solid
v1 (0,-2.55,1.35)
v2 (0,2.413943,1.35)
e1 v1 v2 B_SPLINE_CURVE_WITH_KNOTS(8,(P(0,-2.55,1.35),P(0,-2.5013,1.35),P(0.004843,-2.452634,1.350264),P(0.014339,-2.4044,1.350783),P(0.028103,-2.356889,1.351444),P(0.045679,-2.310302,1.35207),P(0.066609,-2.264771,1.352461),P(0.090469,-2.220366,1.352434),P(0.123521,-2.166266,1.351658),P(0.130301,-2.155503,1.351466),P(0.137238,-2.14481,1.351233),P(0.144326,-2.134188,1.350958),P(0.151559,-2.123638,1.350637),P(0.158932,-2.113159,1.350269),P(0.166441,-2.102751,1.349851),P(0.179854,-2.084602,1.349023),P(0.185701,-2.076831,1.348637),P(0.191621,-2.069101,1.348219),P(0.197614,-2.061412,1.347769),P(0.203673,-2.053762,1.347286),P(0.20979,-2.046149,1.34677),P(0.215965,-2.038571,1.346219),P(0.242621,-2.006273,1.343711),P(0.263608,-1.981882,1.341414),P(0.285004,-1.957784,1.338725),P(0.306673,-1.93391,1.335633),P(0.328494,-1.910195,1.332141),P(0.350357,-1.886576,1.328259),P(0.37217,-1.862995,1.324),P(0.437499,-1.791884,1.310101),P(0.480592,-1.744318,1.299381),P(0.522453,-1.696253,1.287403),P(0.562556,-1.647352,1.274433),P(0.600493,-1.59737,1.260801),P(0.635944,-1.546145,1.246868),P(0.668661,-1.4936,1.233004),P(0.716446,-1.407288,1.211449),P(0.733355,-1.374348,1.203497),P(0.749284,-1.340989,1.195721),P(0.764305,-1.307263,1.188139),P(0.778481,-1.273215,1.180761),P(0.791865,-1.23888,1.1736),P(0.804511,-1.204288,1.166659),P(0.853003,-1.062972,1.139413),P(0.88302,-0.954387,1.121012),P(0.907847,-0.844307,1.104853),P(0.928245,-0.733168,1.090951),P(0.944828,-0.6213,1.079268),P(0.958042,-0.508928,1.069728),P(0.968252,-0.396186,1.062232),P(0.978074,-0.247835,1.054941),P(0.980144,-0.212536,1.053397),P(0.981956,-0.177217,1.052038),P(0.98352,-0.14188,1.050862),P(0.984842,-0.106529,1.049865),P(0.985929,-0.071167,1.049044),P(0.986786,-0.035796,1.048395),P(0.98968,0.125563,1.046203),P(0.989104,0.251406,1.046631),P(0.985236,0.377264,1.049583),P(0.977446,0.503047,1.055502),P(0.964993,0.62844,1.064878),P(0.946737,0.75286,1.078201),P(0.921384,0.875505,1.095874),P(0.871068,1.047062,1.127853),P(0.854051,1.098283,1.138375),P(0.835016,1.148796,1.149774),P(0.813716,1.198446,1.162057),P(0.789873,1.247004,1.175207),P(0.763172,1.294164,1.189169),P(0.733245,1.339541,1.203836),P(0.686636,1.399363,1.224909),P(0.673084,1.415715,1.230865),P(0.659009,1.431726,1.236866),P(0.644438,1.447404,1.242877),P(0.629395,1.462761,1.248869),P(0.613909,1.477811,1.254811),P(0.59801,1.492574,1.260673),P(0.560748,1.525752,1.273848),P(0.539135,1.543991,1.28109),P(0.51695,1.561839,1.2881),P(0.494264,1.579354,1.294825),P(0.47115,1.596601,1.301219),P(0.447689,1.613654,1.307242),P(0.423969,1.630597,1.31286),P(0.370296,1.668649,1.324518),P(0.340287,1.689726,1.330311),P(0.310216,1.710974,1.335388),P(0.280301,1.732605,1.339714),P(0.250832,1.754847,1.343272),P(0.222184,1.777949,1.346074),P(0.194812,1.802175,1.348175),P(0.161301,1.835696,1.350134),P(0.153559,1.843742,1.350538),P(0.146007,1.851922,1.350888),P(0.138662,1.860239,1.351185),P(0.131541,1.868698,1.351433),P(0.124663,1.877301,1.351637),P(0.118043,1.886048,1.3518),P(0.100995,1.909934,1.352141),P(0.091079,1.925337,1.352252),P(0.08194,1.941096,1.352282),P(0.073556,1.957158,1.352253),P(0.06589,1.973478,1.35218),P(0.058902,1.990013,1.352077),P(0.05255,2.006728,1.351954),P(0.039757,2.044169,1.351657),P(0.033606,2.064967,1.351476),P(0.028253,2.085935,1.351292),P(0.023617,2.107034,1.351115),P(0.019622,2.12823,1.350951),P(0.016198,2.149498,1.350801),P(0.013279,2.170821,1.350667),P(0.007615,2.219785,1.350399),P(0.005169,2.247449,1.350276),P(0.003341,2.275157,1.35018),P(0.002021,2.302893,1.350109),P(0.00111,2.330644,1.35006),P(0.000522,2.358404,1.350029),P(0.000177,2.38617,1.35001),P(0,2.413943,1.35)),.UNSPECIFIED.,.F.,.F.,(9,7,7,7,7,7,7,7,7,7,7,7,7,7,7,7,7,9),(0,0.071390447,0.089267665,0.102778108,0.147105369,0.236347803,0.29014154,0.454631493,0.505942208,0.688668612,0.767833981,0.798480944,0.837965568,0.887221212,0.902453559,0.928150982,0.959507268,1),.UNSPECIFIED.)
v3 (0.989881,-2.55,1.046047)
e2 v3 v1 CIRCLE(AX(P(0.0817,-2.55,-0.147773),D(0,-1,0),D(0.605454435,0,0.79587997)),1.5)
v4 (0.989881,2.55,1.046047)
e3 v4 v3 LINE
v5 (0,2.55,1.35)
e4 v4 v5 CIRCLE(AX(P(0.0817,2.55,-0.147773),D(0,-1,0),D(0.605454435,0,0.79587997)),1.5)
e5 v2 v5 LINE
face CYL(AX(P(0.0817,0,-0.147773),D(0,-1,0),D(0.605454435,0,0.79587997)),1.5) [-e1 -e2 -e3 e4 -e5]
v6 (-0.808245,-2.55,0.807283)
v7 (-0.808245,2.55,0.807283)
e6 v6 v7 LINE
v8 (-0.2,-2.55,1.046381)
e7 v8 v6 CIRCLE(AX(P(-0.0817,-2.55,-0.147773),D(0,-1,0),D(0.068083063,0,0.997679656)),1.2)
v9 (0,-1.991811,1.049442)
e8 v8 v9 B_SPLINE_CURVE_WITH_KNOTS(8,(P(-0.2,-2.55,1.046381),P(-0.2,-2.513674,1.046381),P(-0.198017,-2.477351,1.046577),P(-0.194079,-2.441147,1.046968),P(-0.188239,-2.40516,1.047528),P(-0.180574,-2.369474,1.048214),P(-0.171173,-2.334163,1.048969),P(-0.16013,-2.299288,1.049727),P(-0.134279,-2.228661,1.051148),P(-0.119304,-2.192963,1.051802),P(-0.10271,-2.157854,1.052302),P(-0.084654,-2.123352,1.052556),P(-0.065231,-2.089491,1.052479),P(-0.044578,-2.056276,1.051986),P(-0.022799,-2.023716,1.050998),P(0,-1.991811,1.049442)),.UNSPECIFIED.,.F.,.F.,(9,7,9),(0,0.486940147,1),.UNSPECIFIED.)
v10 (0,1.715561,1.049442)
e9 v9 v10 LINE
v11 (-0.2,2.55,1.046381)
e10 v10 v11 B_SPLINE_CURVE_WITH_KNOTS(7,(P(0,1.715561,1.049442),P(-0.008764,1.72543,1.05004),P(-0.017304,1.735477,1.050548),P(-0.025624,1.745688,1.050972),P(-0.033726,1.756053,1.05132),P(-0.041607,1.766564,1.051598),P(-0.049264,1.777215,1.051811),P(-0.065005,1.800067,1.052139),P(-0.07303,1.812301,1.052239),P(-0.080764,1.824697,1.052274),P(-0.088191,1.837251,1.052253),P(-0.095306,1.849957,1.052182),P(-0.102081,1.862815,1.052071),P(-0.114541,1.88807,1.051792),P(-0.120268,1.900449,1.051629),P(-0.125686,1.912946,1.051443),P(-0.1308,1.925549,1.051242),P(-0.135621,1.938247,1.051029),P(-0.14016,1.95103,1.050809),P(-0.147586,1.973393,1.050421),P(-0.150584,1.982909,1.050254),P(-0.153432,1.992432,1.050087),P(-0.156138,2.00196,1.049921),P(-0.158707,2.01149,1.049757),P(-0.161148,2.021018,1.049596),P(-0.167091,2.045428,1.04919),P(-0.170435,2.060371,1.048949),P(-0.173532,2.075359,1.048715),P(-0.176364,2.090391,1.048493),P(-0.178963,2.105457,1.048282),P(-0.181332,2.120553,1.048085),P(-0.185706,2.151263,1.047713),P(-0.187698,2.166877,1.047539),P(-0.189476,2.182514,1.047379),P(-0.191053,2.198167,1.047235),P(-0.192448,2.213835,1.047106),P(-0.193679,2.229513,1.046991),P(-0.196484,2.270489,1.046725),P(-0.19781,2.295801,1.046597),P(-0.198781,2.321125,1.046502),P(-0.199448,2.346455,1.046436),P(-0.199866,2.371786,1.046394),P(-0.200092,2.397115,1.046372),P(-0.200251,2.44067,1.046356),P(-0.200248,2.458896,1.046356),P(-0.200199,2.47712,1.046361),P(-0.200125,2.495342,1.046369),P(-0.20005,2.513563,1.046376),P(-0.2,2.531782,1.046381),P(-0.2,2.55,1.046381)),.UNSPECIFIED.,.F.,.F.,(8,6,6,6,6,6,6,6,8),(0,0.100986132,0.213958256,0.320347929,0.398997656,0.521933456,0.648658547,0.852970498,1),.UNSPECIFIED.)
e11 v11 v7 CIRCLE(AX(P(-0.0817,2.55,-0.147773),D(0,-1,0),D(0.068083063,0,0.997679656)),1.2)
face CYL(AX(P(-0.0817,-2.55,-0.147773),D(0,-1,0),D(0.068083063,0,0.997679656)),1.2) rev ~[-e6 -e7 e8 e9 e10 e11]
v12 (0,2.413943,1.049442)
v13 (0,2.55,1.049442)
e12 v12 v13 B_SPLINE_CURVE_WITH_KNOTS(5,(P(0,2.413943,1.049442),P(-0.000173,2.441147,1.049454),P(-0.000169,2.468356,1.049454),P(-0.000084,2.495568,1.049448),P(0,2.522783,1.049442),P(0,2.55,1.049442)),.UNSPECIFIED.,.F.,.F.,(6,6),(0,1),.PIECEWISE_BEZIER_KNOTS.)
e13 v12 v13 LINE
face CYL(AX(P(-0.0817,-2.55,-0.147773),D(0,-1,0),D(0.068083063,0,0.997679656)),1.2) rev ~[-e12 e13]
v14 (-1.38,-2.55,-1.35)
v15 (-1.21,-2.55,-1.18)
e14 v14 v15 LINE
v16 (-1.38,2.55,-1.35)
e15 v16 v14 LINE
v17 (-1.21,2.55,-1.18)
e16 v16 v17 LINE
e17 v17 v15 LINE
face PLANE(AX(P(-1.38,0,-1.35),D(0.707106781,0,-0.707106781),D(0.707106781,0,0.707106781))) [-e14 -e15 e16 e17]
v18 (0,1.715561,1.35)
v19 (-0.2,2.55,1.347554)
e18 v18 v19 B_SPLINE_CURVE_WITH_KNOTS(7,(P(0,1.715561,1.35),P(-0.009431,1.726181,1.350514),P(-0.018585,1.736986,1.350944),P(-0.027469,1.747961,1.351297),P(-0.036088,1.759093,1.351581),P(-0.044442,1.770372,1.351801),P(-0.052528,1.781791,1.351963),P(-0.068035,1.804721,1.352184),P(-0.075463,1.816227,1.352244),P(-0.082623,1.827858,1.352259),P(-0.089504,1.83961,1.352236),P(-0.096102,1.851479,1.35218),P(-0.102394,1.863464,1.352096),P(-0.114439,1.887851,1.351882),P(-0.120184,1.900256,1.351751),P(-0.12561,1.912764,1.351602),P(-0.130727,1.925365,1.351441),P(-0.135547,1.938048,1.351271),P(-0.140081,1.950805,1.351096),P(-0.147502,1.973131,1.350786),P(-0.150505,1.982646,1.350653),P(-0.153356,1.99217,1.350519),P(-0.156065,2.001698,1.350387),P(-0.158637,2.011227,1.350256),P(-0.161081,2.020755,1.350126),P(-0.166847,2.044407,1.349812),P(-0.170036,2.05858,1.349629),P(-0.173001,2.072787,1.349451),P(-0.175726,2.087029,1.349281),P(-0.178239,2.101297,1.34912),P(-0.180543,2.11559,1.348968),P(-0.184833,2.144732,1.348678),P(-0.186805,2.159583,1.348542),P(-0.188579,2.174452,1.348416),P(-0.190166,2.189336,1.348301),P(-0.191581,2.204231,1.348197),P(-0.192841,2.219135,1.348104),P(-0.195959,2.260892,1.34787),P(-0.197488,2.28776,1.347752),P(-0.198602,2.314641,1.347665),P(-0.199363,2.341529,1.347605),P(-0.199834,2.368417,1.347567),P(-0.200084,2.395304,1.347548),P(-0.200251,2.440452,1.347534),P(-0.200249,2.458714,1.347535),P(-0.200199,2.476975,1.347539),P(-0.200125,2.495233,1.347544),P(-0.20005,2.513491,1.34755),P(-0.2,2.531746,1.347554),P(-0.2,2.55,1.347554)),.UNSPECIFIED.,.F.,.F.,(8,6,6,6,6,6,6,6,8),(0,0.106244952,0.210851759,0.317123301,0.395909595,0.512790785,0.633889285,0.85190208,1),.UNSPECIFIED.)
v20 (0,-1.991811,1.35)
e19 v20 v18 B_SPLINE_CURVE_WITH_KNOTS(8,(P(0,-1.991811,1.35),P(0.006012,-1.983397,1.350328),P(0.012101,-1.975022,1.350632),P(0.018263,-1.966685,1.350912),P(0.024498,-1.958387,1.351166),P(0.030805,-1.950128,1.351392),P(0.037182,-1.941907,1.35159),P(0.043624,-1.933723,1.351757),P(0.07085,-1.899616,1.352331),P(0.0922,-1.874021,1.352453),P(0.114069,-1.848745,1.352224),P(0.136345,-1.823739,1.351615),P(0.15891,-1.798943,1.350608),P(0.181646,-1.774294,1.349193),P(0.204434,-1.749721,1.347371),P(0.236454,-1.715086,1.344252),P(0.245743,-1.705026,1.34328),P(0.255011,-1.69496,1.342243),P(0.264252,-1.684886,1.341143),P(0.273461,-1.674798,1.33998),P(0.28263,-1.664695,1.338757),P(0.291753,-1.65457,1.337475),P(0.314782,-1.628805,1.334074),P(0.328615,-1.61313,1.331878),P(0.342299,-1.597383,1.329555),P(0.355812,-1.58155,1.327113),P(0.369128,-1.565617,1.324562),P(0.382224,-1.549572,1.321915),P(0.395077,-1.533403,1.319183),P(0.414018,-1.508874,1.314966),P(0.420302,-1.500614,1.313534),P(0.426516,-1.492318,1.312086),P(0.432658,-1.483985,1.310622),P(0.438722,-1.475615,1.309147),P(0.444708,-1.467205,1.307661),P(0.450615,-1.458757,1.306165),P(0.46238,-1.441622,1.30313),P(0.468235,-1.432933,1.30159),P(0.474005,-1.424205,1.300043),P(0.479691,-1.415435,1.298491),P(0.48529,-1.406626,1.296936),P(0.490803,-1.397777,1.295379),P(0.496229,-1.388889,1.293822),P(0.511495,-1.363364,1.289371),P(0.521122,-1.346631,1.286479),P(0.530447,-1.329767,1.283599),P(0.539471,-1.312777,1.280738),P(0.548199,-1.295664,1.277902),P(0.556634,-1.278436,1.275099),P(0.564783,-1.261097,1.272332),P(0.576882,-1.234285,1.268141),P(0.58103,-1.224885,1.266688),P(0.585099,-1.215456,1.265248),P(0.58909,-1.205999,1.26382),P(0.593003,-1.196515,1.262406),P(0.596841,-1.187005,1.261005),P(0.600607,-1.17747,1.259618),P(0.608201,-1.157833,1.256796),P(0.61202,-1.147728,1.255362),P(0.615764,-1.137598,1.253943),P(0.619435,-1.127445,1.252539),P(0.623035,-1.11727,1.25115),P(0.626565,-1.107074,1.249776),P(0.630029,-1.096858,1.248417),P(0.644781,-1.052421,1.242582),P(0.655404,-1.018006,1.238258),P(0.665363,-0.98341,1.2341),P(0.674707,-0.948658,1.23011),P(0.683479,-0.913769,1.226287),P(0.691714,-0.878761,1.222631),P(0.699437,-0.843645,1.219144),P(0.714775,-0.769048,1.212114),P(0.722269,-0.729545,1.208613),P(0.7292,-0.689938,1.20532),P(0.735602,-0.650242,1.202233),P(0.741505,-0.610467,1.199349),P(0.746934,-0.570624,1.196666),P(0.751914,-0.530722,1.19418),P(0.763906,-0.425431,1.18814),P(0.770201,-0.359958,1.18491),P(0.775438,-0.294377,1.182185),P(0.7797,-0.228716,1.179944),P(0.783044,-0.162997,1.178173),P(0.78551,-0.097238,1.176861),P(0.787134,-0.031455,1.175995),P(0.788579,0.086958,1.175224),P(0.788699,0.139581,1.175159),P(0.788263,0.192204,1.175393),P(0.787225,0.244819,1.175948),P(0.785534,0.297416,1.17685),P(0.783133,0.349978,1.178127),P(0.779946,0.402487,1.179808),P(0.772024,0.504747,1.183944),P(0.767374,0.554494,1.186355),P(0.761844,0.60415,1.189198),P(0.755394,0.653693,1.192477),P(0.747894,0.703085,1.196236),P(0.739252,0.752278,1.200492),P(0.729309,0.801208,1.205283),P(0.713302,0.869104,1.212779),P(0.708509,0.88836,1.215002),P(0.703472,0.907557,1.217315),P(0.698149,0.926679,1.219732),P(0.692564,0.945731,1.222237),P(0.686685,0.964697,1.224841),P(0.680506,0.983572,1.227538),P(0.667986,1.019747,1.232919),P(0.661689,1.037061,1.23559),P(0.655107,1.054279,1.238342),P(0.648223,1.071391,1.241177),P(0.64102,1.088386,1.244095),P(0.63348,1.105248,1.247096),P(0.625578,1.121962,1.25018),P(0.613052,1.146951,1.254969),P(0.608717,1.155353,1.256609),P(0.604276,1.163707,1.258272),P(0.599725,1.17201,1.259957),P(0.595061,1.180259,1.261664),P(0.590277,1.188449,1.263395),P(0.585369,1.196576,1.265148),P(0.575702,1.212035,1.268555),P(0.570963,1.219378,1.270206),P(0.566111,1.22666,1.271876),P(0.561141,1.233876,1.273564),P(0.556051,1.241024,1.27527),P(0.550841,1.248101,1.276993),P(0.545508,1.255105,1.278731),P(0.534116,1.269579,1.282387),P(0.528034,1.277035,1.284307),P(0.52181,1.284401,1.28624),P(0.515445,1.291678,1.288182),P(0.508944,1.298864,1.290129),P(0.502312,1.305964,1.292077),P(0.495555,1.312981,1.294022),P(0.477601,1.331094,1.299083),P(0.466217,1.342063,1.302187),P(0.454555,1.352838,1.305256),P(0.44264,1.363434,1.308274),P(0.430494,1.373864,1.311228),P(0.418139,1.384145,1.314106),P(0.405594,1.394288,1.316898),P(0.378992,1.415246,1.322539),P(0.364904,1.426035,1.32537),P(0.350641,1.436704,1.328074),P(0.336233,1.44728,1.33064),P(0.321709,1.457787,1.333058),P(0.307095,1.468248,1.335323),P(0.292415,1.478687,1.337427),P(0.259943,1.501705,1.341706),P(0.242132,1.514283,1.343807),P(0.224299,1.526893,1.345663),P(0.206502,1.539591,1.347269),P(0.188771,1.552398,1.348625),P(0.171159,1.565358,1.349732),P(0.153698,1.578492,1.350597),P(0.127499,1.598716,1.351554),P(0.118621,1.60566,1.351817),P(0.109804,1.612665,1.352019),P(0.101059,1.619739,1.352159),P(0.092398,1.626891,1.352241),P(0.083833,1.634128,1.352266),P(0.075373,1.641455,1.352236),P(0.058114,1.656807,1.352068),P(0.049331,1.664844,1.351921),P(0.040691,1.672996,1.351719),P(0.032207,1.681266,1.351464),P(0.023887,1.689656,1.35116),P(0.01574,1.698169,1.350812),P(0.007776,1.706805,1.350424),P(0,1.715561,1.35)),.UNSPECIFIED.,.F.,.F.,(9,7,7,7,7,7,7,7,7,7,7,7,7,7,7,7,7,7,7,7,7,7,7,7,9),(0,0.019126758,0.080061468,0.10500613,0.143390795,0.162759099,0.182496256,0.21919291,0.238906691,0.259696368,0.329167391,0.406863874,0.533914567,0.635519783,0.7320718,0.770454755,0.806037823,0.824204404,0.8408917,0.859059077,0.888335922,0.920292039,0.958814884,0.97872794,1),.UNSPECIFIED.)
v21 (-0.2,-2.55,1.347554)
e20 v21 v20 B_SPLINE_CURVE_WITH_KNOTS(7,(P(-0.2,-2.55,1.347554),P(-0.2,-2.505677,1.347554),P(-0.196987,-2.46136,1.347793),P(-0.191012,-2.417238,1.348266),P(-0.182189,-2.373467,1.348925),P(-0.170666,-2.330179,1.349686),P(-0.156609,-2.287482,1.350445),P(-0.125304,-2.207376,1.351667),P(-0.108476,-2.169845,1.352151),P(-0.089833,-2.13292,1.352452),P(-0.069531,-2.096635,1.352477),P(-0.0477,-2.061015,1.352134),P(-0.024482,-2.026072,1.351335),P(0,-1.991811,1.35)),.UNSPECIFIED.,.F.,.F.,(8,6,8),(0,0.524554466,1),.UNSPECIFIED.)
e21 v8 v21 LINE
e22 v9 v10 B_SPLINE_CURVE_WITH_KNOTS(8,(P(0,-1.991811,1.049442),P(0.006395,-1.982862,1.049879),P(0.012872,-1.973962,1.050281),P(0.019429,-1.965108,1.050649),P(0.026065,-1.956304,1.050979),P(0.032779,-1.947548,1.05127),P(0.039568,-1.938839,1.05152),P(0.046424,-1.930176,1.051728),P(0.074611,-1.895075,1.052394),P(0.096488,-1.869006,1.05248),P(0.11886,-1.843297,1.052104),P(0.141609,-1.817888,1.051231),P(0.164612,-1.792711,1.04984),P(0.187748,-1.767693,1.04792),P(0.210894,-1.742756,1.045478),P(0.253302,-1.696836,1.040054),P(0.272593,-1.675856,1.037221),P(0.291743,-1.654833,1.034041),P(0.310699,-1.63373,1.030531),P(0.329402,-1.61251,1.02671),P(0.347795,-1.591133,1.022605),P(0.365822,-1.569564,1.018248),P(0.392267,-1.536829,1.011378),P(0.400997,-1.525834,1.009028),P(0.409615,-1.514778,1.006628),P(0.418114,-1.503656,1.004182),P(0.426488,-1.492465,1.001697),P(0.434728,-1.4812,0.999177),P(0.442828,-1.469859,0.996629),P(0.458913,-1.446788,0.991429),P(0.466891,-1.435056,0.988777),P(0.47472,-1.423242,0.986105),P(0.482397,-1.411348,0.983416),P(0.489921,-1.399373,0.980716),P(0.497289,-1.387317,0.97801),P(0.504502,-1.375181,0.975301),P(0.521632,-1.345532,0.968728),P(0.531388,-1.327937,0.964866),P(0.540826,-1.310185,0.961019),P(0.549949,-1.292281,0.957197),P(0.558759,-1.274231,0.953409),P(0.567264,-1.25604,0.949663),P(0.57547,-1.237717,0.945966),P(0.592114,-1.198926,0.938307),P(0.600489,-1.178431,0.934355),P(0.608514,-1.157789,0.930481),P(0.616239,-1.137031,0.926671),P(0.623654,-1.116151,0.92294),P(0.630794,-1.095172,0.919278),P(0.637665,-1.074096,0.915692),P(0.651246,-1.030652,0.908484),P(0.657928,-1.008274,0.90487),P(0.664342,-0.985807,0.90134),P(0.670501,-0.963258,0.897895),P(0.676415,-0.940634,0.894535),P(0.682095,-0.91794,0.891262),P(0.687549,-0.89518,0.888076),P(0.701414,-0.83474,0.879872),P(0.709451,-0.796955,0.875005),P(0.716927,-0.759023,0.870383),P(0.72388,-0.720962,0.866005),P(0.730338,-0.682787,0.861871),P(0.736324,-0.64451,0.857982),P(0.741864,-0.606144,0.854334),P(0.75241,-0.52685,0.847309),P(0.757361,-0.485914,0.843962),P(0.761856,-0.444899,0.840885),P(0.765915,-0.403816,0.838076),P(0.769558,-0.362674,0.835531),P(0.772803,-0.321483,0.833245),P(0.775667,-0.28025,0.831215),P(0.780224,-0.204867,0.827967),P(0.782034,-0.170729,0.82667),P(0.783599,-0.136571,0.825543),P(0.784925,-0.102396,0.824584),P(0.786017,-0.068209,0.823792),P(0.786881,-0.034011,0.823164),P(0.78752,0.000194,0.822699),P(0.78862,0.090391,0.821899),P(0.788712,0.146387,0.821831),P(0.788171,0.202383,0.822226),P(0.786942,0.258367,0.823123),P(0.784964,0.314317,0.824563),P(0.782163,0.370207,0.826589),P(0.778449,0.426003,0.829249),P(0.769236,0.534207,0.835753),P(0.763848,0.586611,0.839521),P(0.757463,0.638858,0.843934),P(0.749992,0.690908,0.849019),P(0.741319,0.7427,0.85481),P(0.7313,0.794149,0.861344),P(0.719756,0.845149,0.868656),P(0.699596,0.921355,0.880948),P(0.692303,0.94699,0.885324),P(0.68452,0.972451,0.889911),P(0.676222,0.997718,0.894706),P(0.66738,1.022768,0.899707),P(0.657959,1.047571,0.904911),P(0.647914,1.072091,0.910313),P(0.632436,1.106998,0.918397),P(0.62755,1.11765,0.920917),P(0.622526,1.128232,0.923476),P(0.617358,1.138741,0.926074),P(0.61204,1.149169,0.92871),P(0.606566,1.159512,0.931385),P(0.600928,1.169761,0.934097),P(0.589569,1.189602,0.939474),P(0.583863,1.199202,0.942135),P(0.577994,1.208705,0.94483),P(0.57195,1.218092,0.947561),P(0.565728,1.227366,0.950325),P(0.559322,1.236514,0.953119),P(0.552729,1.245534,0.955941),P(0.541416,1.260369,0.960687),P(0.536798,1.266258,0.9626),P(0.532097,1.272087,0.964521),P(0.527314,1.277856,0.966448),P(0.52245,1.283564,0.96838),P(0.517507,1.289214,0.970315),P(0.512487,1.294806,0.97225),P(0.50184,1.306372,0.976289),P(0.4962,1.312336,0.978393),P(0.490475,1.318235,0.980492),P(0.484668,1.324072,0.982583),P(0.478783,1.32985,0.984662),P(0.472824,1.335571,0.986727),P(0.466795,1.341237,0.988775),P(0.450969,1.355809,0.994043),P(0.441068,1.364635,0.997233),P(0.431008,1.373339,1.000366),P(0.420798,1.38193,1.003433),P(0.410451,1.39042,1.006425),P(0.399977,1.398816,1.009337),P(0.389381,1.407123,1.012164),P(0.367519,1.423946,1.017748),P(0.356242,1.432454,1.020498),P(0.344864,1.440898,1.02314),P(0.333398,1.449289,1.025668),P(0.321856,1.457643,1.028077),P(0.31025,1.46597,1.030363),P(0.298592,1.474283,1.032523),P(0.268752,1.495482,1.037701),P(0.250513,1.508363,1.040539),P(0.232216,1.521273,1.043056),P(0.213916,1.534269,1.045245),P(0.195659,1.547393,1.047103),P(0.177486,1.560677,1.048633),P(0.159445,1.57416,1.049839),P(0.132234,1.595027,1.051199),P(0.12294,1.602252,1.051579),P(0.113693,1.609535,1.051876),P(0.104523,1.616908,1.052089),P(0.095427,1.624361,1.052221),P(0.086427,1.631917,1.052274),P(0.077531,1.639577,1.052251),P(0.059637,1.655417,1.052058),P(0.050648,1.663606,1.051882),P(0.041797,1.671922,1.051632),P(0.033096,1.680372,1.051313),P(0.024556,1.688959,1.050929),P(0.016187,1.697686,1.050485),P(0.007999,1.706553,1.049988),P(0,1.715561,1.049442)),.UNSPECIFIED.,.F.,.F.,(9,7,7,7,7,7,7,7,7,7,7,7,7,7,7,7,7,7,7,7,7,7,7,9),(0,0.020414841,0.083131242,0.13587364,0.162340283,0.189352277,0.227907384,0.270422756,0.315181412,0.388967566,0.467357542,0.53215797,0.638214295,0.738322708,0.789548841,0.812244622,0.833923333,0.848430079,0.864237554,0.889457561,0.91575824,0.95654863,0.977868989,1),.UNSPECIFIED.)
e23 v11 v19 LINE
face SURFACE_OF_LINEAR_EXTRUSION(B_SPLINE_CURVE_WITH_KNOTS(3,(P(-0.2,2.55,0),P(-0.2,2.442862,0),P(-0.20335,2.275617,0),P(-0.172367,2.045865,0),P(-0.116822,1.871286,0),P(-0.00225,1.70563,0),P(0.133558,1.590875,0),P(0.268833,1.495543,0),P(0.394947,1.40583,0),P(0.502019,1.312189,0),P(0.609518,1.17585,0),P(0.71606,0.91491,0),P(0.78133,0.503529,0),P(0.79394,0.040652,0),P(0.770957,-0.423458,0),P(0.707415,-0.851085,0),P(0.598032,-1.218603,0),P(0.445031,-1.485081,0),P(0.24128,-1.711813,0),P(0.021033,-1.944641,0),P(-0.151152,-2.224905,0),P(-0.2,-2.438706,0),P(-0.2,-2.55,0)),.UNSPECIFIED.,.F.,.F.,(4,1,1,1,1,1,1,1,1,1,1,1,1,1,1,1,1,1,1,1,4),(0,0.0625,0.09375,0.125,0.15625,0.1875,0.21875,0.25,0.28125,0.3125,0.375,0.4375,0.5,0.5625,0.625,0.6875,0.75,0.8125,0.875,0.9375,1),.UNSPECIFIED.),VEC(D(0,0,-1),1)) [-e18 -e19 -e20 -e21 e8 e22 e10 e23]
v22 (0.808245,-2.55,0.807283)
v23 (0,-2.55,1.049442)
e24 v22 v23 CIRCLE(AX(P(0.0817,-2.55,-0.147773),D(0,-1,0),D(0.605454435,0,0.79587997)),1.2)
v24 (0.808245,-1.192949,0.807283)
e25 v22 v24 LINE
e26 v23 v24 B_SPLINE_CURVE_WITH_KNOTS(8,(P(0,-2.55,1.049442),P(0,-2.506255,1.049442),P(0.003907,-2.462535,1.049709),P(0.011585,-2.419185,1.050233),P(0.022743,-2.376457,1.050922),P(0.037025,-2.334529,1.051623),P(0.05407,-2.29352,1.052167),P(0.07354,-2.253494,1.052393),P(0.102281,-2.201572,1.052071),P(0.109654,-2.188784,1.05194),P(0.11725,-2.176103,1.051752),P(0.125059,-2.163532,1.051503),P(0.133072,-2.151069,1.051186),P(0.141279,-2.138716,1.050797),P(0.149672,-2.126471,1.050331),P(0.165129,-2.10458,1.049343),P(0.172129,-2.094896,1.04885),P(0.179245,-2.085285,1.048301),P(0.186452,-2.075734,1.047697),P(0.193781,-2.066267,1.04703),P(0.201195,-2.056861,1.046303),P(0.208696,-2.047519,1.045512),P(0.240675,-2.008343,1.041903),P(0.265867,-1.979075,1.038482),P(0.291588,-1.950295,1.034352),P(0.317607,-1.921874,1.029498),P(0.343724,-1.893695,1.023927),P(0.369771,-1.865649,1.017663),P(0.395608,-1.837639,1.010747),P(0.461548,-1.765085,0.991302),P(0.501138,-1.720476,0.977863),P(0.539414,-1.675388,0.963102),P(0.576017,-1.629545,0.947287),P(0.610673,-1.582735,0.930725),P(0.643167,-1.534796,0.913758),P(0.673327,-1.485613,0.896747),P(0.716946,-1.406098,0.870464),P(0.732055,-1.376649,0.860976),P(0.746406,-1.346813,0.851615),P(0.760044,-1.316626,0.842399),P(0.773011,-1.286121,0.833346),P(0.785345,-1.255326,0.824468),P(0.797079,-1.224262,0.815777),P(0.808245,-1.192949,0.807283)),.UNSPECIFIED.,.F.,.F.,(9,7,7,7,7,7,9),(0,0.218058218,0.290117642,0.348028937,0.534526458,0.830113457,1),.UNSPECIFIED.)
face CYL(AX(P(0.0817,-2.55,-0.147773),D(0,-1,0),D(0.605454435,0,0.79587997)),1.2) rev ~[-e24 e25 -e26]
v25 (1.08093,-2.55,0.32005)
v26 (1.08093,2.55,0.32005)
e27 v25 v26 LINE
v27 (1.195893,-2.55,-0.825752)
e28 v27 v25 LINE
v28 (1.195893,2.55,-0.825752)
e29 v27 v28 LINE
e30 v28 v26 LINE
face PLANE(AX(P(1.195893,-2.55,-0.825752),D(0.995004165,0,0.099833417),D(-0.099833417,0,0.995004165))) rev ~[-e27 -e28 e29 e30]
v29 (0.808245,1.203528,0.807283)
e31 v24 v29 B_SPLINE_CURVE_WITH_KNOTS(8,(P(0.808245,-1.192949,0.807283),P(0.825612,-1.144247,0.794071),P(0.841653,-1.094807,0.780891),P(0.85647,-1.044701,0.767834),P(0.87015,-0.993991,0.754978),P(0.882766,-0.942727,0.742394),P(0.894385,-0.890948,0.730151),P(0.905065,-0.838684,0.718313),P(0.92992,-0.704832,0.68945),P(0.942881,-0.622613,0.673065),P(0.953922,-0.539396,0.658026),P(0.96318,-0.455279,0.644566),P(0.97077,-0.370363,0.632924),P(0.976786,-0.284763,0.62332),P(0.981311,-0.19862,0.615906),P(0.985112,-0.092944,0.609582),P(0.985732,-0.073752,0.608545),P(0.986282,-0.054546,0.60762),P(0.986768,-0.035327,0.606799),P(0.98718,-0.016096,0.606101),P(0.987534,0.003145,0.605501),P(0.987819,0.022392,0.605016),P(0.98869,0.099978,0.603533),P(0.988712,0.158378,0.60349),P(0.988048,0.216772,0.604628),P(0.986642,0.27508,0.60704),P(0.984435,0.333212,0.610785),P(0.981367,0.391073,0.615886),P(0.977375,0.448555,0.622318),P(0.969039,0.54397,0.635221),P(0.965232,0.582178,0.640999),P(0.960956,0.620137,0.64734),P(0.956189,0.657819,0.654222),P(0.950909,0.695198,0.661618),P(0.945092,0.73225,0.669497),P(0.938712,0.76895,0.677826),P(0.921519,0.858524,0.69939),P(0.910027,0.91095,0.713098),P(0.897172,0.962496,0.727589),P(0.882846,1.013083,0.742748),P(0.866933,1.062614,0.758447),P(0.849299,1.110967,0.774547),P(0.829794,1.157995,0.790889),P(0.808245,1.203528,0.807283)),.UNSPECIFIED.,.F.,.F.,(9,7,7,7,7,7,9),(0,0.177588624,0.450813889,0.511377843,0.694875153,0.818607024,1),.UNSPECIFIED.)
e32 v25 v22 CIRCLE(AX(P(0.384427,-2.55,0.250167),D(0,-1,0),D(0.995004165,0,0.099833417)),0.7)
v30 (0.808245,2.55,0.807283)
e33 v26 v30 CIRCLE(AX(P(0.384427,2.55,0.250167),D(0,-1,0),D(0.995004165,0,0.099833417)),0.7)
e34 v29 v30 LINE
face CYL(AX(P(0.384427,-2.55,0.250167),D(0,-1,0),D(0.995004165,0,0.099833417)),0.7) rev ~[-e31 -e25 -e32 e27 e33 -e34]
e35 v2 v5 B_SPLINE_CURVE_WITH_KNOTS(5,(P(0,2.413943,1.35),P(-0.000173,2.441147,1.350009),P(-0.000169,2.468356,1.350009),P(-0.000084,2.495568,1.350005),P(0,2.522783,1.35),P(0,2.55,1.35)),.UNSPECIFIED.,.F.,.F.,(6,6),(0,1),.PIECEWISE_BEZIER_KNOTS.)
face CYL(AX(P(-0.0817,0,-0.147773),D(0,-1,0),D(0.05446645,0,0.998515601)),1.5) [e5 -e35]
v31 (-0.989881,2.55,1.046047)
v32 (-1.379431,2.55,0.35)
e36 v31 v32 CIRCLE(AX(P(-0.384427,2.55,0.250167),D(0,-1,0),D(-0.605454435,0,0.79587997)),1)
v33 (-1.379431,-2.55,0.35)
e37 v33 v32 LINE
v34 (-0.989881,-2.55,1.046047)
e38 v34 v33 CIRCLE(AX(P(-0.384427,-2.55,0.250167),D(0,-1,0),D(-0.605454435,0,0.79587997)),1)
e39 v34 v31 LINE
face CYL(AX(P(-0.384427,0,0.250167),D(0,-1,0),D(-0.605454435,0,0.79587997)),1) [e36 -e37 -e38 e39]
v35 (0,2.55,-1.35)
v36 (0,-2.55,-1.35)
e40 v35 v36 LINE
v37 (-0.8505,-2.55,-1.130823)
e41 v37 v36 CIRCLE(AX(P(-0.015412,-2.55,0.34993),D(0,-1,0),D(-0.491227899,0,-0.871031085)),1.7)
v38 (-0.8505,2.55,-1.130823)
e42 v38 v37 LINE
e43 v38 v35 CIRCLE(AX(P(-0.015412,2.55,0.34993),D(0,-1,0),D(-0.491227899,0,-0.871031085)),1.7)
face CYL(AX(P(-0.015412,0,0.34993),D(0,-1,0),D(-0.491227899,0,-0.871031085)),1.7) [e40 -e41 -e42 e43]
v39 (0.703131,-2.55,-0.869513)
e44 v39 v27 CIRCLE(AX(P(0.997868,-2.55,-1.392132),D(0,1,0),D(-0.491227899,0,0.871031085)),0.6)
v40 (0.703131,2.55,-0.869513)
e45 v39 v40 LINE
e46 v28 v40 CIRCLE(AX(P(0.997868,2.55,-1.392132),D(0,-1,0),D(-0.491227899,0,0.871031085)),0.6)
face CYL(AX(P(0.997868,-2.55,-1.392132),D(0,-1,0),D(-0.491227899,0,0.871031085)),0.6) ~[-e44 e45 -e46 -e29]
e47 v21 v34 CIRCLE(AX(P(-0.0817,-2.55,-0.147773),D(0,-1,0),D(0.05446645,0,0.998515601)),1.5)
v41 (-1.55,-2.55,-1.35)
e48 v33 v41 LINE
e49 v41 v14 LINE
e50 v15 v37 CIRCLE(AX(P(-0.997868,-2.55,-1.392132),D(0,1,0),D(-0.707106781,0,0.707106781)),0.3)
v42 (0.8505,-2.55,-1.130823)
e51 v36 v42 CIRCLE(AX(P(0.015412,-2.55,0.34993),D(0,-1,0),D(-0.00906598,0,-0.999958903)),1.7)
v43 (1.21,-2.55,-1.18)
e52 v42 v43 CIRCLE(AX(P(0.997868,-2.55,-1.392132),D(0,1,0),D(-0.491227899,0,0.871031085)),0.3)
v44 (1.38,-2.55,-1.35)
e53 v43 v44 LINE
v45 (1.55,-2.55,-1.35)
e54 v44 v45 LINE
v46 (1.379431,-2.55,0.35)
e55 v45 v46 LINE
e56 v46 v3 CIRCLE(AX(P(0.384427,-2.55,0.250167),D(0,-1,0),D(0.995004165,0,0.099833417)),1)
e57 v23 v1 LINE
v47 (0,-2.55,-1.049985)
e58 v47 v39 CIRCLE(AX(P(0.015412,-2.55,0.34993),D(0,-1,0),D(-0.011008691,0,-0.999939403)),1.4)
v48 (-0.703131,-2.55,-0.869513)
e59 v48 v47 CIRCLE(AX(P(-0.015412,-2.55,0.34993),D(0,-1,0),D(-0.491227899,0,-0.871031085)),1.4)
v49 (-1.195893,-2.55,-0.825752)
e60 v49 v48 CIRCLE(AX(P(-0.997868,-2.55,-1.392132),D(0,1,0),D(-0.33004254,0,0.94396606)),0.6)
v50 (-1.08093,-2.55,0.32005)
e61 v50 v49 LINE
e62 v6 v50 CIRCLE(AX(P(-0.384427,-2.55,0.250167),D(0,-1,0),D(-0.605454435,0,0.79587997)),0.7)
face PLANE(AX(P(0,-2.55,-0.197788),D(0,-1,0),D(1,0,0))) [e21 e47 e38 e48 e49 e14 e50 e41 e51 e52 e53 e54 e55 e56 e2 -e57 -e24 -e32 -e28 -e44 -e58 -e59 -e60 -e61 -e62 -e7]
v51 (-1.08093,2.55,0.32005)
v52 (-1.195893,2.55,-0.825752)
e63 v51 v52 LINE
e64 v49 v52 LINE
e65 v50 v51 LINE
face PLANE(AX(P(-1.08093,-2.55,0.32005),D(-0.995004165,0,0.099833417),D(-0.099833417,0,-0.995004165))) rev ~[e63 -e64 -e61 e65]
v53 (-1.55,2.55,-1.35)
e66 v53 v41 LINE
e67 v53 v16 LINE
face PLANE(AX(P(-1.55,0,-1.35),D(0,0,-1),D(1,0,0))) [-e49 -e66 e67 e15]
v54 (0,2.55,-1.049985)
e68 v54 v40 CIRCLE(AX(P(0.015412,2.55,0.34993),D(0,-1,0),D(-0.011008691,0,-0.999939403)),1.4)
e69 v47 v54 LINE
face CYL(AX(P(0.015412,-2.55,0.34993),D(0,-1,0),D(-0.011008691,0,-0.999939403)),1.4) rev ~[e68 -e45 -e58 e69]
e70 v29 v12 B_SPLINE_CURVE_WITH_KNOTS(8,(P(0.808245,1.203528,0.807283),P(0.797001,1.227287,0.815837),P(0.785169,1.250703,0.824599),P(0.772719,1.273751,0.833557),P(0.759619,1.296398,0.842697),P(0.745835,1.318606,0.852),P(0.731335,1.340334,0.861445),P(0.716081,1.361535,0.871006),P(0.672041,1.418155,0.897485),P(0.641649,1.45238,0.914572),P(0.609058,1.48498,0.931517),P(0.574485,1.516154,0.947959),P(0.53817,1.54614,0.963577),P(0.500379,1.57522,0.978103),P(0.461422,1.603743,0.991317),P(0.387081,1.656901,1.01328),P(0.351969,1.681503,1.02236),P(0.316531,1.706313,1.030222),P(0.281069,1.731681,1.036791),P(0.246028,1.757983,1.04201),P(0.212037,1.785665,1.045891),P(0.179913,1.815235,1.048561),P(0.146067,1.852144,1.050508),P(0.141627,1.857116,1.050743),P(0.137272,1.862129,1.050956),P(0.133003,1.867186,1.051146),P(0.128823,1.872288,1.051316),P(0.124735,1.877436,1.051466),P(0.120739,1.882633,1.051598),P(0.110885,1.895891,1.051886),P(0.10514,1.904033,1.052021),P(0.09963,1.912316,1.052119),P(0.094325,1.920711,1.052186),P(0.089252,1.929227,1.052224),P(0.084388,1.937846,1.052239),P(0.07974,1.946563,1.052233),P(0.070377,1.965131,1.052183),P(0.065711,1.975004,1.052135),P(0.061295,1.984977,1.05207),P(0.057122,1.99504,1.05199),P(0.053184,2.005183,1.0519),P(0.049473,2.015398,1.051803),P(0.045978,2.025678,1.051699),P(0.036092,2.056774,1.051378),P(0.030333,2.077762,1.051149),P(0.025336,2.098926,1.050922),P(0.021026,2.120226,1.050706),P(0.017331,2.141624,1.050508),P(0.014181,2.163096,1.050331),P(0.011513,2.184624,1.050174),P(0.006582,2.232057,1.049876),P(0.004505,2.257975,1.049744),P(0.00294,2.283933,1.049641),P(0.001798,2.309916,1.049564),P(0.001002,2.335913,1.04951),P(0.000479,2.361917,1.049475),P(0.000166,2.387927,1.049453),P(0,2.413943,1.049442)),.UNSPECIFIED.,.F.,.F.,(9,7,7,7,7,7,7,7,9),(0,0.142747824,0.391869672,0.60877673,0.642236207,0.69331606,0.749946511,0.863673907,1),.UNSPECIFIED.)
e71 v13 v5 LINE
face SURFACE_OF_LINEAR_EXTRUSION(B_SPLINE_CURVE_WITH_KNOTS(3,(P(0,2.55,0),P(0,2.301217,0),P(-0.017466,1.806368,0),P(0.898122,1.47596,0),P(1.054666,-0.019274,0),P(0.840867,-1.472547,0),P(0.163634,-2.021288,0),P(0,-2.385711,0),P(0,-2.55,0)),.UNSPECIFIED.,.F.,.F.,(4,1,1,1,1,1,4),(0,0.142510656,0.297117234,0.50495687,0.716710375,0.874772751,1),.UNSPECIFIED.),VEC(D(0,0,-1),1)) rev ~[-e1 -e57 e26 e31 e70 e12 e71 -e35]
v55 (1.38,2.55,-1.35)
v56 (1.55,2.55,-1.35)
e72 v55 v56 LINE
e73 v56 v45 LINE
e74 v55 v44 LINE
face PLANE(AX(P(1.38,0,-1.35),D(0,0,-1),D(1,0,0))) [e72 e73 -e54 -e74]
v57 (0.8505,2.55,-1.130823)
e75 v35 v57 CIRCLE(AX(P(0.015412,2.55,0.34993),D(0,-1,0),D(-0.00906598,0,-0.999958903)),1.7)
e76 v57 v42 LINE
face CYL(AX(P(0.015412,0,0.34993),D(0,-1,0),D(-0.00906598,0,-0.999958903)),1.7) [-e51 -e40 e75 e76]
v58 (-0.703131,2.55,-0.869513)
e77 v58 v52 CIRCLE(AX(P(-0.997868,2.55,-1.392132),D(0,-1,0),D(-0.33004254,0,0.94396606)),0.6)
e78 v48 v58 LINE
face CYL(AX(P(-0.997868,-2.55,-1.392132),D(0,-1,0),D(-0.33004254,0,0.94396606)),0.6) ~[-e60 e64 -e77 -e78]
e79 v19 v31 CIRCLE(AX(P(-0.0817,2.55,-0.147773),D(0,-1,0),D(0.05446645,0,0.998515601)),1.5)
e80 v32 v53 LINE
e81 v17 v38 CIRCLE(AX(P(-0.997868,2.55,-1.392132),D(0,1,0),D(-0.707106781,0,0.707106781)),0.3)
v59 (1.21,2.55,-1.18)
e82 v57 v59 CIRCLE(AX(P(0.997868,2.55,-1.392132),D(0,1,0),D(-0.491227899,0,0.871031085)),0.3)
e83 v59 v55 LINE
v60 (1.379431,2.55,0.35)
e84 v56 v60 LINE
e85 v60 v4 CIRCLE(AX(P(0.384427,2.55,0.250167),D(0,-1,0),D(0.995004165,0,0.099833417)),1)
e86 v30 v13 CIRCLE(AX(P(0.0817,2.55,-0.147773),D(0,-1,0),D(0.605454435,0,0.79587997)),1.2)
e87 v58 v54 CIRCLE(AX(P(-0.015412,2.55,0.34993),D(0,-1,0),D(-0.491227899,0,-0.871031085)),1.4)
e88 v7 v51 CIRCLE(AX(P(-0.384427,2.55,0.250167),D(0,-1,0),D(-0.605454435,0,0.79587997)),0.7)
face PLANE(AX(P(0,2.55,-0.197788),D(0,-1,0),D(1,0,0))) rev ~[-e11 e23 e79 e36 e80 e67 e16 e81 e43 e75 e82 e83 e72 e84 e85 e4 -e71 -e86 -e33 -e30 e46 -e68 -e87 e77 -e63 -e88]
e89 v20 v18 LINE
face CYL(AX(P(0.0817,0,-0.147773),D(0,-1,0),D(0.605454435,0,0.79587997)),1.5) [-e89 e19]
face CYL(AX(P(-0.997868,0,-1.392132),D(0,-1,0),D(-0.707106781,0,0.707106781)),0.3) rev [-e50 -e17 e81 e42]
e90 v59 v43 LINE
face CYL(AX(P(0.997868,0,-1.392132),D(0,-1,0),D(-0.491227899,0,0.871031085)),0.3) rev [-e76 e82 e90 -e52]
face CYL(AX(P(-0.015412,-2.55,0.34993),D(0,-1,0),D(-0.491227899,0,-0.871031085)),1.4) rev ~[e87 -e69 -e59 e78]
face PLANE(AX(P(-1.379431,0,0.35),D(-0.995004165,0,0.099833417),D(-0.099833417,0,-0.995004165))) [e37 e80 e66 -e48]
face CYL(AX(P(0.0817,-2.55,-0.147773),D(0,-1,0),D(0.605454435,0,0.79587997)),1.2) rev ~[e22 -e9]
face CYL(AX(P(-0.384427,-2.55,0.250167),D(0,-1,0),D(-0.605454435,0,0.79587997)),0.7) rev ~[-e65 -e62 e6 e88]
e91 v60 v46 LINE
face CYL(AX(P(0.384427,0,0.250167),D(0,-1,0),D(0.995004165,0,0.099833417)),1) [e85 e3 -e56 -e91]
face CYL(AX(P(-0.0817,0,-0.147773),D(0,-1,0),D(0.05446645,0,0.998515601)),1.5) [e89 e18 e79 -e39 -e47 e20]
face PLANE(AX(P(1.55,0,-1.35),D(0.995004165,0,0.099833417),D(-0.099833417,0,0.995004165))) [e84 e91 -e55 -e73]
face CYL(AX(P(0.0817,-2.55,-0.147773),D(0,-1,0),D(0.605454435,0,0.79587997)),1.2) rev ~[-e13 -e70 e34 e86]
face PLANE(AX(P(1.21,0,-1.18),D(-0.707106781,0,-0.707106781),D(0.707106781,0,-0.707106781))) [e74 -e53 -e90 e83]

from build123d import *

# Parameters (mm, degrees)
F1_DEPTH = 2.55
F3_DEPTH = 25
F5_DEPTH = 25


# Not quite as in the source:
# - the dataset's text gives a spline's control points without its knots; the knots are read off the source's solid


with BuildPart() as f1:
    # F0 (on Front) → F1 (new body, symmetric)
    with BuildSketch(Plane.XZ):
        with BuildLine():
            Line((-1.3794310575, 0.35), (-1.55, -1.35))
            Line((-1.55, -1.35), (-1.38, -1.35))
            Line((-1.38, -1.35), (-1.21, -1.18))
            ThreePointArc((-1.21, -1.18), (-1.0385273379, -1.0949001124), (-0.8504995958, -1.1308227089))
            ThreePointArc((-0.8504995958, -1.1308227089), (-0.4396486045, -1.2962847488), (0, -1.35))
            ThreePointArc((0, -1.35), (0.4396486045, -1.2962847488), (0.8504995958, -1.1308227089))
            ThreePointArc((0.8504995958, -1.1308227089), (1.0385273379, -1.0949001124), (1.21, -1.18))
            Line((1.21, -1.18), (1.38, -1.35))
            Line((1.38, -1.35), (1.55, -1.35))
            Line((1.55, -1.35), (1.3794310575, 0.35))
            ThreePointArc((1.3794310575, 0.35), (1.2570591939, 0.7385443736), (0.9898813272, 1.0460465537))
            ThreePointArc((0.9898813272, 1.0460465537), (0.5220007527, 1.2861495252), (0, 1.35))
            ThreePointArc((0, 1.35), (-0.5220007527, 1.2861495252), (-0.9898813272, 1.0460465537))
            ThreePointArc((-0.9898813272, 1.0460465537), (-1.2570591939, 0.7385443736), (-1.3794310575, 0.35))
        make_face()
    extrude(amount=F1_DEPTH, both=True)

    # F2 (on face) → F3 (cut)
    with BuildSketch(Plane.XZ.offset(2.55)):
        with BuildLine():
            ThreePointArc((-1.1958934952, -0.825752383), (-0.9447923506, -0.7944841457), (-0.7031312179, -0.8695133691))
            ThreePointArc((-0.7031312179, -0.8695133691), (-0.3634662432, -1.0061149648), (0, -1.0499850117))
            ThreePointArc((0, -1.0499850117), (0.3634662432, -1.0061149648), (0.7031312179, -0.8695133691))
            ThreePointArc((0.7031312179, -0.8695133691), (0.9447923506, -0.7944841457), (1.1958934952, -0.825752383))
            Line((1.1958934952, -0.825752383), (1.0809297915, 0.3200499734))
            ThreePointArc((1.0809297915, 0.3200499734), (0.995269489, 0.5920310285), (0.8082449867, 0.8072825495))
            ThreePointArc((0.8082449867, 0.8072825495), (0.4261075642, 1.0017409157), (0, 1.0494421693))
            ThreePointArc((0, 1.0494421693), (-0.4261075642, 1.0017409157), (-0.8082449867, 0.8072825495))
            ThreePointArc((-0.8082449867, 0.8072825495), (-0.995269489, 0.5920310285), (-1.0809297915, 0.3200499734))
            Line((-1.0809297915, 0.3200499734), (-1.1958934952, -0.825752383))
        make_face()
    extrude(amount=-F3_DEPTH, mode=Mode.SUBTRACT)

    # F4 (on Top) → F5 (cut)
    with BuildSketch(Plane.XY):
        with BuildLine():
            add(Edge.make_bspline(
                [(0, 2.55), (0, 2.3012170484), (-0.0174660225, 1.8063678705), (0.8981223952, 1.4759598818), (1.0546660634, -0.0192739265), (0.8408673454, -1.4725471105), (0.1636337962, -2.021288105), (0, -2.3857110462), (0, -2.55)],
                knots=[0, 0, 0, 0, 0.1425106556, 0.297117234, 0.5049568696, 0.7167103753, 0.8747727514, 1, 1, 1, 1], degree=3))
            Line((0, 2.55), (-0.199999971, 2.55))
            add(Edge.make_bspline(
                [(-0.199999971, 2.55), (-0.199999971, 2.442861913), (-0.2033495667, 2.2756171701), (-0.1723667571, 2.0458653132), (-0.1168215656, 1.8712862158), (-0.0022501698, 1.7056297023), (0.1335578991, 1.590875413), (0.2688325655, 1.4955434762), (0.39494662, 1.4058304378), (0.5020185664, 1.3121894563), (0.6095184956, 1.1758498184), (0.7160601321, 0.9149098947), (0.781329804, 0.5035285403), (0.7939401967, 0.0406520803), (0.7709571004, -0.4234581557), (0.7074148963, -0.8510847156), (0.598032004, -1.2186029446), (0.4450309549, -1.4850813091), (0.2412797275, -1.7118129344), (0.0210326126, -1.9446414735), (-0.1511521088, -2.2249054182), (-0.199999971, -2.4387055988), (-0.199999971, -2.55)],
                knots=[0, 0, 0, 0, 0.0625, 0.09375, 0.125, 0.15625, 0.1875, 0.21875, 0.25, 0.28125, 0.3125, 0.375, 0.4375, 0.5, 0.5625, 0.625, 0.6875, 0.75, 0.8125, 0.875, 0.9375, 1, 1, 1, 1], degree=3))
            Line((-0.199999971, -2.55), (0, -2.55))
        make_face()
    extrude(amount=F5_DEPTH, mode=Mode.SUBTRACT)


solid = f1.part
